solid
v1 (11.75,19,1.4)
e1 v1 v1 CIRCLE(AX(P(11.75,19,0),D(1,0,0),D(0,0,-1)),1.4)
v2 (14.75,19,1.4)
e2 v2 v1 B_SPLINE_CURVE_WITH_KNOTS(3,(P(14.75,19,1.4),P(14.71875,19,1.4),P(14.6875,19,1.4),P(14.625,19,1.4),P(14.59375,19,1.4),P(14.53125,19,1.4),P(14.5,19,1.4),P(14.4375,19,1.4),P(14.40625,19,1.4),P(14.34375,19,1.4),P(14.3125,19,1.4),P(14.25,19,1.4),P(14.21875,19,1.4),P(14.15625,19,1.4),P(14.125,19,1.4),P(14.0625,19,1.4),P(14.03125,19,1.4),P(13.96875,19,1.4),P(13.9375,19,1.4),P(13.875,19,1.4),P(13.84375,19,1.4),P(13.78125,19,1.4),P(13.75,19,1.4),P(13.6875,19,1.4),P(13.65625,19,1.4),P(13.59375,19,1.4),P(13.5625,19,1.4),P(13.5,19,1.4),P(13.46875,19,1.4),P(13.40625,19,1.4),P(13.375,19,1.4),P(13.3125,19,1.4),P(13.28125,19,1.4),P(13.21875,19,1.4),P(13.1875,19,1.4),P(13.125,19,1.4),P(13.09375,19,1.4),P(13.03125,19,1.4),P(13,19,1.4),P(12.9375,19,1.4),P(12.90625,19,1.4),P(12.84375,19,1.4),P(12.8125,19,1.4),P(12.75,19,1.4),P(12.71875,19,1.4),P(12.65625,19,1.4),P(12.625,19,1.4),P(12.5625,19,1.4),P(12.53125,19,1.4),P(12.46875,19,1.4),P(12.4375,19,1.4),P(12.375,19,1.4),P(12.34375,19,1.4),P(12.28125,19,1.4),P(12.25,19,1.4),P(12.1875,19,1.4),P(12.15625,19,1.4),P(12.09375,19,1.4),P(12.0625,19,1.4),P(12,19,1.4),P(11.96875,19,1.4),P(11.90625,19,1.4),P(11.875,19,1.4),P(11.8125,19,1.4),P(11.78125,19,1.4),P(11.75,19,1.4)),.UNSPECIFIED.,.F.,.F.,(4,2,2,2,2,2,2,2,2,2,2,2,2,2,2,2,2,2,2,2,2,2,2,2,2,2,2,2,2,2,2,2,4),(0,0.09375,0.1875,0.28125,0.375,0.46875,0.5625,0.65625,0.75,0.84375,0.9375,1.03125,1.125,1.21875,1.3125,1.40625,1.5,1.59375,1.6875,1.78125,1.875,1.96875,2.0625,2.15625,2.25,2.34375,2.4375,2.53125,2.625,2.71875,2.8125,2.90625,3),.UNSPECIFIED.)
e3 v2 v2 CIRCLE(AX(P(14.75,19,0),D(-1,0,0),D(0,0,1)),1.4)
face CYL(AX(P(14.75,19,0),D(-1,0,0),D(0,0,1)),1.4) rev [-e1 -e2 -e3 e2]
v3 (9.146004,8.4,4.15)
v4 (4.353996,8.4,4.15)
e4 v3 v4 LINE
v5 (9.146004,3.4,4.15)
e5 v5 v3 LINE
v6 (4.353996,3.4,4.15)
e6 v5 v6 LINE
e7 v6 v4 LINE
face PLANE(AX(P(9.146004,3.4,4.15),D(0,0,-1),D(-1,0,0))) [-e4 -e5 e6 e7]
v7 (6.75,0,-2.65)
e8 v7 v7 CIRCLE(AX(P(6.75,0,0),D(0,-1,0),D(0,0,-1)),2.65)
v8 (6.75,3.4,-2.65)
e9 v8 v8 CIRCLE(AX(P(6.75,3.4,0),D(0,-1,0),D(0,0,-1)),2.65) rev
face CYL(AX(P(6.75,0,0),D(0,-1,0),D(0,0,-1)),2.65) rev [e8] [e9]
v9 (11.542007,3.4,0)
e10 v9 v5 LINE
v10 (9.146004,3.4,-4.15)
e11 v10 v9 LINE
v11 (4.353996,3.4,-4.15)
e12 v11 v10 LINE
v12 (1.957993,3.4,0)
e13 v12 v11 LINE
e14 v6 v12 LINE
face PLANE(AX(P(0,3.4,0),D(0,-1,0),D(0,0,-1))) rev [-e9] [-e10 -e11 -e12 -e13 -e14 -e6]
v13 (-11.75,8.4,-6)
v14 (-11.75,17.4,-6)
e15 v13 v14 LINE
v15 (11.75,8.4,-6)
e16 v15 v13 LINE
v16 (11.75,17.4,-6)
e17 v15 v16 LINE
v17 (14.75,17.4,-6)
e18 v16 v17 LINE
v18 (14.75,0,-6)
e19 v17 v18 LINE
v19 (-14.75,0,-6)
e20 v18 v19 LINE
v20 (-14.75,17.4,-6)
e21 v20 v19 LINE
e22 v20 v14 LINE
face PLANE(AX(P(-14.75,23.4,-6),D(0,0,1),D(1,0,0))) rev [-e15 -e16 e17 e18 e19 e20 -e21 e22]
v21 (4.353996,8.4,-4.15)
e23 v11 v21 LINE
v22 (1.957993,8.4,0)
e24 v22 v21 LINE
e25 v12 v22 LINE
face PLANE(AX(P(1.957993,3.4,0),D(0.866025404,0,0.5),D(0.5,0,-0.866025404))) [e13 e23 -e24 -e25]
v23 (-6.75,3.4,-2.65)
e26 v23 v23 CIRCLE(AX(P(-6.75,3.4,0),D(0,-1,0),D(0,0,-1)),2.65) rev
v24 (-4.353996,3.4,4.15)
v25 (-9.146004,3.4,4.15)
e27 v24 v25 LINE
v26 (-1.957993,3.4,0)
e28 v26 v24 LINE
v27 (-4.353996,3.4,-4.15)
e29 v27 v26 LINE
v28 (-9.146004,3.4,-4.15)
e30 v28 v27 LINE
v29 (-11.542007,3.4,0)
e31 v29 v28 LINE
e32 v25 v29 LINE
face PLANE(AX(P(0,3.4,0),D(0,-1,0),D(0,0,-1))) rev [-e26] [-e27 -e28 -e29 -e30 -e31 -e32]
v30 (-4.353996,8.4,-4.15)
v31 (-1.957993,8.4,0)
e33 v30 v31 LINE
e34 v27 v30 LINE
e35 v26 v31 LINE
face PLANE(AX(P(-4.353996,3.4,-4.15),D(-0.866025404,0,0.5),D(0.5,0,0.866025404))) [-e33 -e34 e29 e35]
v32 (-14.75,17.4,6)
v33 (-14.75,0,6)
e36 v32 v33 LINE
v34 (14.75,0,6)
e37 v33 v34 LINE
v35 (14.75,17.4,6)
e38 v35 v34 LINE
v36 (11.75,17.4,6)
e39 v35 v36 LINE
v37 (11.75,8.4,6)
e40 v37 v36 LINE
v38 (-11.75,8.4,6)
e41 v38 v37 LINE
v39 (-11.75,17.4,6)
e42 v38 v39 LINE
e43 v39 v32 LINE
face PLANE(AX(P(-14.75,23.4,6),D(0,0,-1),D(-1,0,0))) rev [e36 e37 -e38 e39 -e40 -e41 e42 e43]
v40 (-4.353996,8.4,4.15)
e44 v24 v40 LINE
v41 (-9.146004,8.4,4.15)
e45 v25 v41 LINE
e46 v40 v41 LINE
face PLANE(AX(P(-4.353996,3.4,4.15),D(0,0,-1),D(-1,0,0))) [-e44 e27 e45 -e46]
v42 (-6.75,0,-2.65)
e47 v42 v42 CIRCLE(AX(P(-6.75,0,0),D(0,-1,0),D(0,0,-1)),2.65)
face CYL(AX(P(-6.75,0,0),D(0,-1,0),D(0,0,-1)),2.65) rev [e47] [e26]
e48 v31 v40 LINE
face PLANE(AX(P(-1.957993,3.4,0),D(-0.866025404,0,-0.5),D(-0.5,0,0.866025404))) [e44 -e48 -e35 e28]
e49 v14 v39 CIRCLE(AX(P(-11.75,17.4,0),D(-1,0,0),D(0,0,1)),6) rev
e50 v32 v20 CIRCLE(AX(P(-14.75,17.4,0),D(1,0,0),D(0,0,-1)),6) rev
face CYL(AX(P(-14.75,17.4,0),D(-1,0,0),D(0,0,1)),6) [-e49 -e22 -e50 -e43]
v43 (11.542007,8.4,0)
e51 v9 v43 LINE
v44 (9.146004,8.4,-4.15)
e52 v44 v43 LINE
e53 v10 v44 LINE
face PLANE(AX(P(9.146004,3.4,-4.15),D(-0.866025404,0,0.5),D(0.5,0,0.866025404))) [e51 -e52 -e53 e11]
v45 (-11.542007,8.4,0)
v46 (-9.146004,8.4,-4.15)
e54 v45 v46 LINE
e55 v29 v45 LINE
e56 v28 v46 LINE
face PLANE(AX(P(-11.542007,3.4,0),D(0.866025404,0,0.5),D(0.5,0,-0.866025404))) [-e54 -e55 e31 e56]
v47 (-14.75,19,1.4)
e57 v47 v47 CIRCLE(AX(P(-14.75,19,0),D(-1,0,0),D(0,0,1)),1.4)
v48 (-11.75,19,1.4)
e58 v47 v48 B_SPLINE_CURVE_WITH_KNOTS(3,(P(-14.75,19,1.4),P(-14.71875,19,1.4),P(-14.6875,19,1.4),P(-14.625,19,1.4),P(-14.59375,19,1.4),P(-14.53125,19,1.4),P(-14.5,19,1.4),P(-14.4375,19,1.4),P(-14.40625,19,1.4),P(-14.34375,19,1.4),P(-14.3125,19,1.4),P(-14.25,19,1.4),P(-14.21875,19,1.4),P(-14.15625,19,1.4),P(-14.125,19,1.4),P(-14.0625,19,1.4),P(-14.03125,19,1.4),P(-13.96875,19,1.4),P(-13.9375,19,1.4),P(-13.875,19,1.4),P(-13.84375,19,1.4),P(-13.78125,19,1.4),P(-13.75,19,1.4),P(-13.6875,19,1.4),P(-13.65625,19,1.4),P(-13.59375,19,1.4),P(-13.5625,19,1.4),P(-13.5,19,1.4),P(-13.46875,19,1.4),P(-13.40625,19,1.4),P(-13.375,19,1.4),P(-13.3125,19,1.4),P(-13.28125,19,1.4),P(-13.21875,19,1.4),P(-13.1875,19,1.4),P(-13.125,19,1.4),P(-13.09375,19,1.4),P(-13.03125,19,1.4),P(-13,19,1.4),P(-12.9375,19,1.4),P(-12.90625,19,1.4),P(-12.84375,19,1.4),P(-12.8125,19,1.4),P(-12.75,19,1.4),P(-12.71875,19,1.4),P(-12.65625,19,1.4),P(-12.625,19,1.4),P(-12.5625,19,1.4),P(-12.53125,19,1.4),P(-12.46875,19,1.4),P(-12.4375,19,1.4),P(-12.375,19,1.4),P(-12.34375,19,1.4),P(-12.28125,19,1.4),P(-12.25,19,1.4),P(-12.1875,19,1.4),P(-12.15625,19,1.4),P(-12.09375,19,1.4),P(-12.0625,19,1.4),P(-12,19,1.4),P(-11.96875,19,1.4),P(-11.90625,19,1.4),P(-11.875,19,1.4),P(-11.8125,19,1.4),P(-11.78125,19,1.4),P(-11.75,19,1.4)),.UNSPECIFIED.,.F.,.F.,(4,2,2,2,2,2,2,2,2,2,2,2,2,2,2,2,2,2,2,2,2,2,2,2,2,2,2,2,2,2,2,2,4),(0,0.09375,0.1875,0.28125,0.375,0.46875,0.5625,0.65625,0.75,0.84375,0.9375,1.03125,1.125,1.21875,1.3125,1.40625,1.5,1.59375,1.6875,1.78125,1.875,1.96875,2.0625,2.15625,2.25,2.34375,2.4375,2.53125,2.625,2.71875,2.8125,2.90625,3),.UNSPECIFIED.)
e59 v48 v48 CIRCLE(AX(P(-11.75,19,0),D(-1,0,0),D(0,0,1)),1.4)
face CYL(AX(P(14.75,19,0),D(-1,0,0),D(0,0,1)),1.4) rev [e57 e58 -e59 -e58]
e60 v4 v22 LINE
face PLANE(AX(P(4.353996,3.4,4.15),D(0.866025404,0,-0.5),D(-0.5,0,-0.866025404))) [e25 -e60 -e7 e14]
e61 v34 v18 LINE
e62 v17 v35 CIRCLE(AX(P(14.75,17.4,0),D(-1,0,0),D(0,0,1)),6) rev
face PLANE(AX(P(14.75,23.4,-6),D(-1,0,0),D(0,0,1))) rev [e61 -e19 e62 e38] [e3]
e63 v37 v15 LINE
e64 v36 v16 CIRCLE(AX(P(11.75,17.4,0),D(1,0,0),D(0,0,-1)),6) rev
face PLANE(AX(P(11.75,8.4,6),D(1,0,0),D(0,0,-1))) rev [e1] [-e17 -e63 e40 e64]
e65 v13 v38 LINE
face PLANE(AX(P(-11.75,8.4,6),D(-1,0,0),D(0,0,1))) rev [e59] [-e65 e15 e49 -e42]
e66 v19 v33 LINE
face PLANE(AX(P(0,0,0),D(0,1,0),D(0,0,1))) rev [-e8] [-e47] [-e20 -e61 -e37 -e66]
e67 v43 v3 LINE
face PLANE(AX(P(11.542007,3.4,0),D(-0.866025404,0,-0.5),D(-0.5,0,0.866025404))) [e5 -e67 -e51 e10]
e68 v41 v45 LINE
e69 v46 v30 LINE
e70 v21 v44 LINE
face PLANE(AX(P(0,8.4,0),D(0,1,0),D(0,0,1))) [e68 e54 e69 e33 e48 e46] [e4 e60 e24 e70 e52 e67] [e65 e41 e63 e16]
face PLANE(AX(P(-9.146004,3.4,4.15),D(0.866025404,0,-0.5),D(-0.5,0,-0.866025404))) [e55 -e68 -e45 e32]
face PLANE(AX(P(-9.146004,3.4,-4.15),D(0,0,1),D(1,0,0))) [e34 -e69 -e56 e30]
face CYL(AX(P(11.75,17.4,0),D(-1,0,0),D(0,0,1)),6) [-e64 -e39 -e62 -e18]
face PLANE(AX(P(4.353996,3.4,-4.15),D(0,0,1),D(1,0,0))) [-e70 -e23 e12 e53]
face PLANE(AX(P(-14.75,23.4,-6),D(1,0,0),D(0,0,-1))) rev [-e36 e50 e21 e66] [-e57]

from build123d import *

# Parameters (mm, degrees)
SKETCH_1_W          = 29.5
SKETCH_1_H          = 12
EXTRUDE_1_DEPTH     = 23.4
SKETCH_3_W          = 23.5
SKETCH_3_H          = 12
CUT_EXTRUDE_1_DEPTH = 15
SKETCH_4_R          = 1.4
CUT_EXTRUDE_2_DEPTH = 39.12886046
FILLET_1_RADIUS     = 6
FILLET_1_LENGTH     = 3
MIRROR_START        = 11.75
MIRROR_1_DEPTH      = 3
HOLE_WIZARD_M5_1_D  = 5.3
CUT_EXTRUDE_4_DEPTH = 5


# Read off the part's stored shape, not the designer's step: 镜向1
with BuildPart() as part:
    # 草图1 → 凸台-拉伸1 (new body)
    with BuildSketch(Plane(origin=(0, 0, 0), x_dir=(1, 0, 0), z_dir=(0, 1, 0))):
        Rectangle(SKETCH_1_W, SKETCH_1_H)
    extrude(amount=EXTRUDE_1_DEPTH)

    # 草图3 → 切除-拉伸1 (cut)
    with BuildSketch(Plane(origin=(0, 23.4, 0), x_dir=(1, 0, 0), z_dir=(0, 1, 0))):
        Rectangle(SKETCH_3_W, SKETCH_3_H)
    extrude(amount=-CUT_EXTRUDE_1_DEPTH, mode=Mode.SUBTRACT)

    # 草图4 → 切除-拉伸2 (cut, through all)
    with BuildSketch(Plane.ZY.offset(14.75)):
        with Locations((0, 19)):
            Circle(SKETCH_4_R)
    extrude(amount=-CUT_EXTRUDE_2_DEPTH, mode=Mode.SUBTRACT)

    # 圆角1: full round fillet: the end face becomes a half cylinder, R = half its width
    fillet_1_face = Plane((-13.25, 23.4, 0), x_dir=(-1, 0, 0), z_dir=(0, 1, 0))  # on the end face: x along it, z out of the body
    fillet_1_slab = fillet_1_face.offset(-FILLET_1_RADIUS / 2) * Box(FILLET_1_LENGTH, 2 * FILLET_1_RADIUS, FILLET_1_RADIUS, mode=Mode.PRIVATE)  # the body's end, R deep
    fillet_1_round = Plane((-13.25, 17.4, 0), x_dir=(0, 1, 0), z_dir=(-1, 0, 0)) * Cylinder(FILLET_1_RADIUS, FILLET_1_LENGTH, mode=Mode.PRIVATE)  # its axis R under the face
    add(fillet_1_slab - fillet_1_round, mode=Mode.SUBTRACT)

    # 镜向1 outline → 镜向1 (cut)
    with BuildSketch(Plane.YZ.offset(MIRROR_START)):
        with BuildLine():
            Line((23.4, 6), (17.4, 6))
            ThreePointArc((17.4, 6), (21.642640687, 4.242640687), (23.4, 0))
            Line((23.4, 0), (23.4, 6))
        make_face()
        with BuildLine():
            Line((23.4, -6), (23.4, 0))
            ThreePointArc((23.4, 0), (21.642640687, -4.242640687), (17.4, -6))
            Line((17.4, -6), (23.4, -6))
        make_face()
    extrude(amount=MIRROR_1_DEPTH, mode=Mode.SUBTRACT)

    # M5 间隙孔1 (through all)
    with Locations(Plane(origin=(0, 0, 0), x_dir=(-1, 0, 0), z_dir=(0, -1, 0))):
        with Locations((-6.75, 0), (6.75, 0)):
            Hole(HOLE_WIZARD_M5_1_D / 2)

    # 草图10 → 切除-拉伸4 (cut)
    with BuildSketch(Plane.XZ.offset(-8.4)):
        Polygon((1.957992766, 0), (4.353996383, -4.15), (9.146003617, -4.15), (11.542007234, 0), (9.146003617, 4.15), (4.353996383, 4.15), align=None)
        Polygon((-11.542007234, 0), (-9.146003617, -4.15), (-4.353996383, -4.15), (-1.957992766, 0), (-4.353996383, 4.15), (-9.146003617, 4.15), align=None)
    extrude(amount=CUT_EXTRUDE_4_DEPTH, mode=Mode.SUBTRACT)


solid = part.part
